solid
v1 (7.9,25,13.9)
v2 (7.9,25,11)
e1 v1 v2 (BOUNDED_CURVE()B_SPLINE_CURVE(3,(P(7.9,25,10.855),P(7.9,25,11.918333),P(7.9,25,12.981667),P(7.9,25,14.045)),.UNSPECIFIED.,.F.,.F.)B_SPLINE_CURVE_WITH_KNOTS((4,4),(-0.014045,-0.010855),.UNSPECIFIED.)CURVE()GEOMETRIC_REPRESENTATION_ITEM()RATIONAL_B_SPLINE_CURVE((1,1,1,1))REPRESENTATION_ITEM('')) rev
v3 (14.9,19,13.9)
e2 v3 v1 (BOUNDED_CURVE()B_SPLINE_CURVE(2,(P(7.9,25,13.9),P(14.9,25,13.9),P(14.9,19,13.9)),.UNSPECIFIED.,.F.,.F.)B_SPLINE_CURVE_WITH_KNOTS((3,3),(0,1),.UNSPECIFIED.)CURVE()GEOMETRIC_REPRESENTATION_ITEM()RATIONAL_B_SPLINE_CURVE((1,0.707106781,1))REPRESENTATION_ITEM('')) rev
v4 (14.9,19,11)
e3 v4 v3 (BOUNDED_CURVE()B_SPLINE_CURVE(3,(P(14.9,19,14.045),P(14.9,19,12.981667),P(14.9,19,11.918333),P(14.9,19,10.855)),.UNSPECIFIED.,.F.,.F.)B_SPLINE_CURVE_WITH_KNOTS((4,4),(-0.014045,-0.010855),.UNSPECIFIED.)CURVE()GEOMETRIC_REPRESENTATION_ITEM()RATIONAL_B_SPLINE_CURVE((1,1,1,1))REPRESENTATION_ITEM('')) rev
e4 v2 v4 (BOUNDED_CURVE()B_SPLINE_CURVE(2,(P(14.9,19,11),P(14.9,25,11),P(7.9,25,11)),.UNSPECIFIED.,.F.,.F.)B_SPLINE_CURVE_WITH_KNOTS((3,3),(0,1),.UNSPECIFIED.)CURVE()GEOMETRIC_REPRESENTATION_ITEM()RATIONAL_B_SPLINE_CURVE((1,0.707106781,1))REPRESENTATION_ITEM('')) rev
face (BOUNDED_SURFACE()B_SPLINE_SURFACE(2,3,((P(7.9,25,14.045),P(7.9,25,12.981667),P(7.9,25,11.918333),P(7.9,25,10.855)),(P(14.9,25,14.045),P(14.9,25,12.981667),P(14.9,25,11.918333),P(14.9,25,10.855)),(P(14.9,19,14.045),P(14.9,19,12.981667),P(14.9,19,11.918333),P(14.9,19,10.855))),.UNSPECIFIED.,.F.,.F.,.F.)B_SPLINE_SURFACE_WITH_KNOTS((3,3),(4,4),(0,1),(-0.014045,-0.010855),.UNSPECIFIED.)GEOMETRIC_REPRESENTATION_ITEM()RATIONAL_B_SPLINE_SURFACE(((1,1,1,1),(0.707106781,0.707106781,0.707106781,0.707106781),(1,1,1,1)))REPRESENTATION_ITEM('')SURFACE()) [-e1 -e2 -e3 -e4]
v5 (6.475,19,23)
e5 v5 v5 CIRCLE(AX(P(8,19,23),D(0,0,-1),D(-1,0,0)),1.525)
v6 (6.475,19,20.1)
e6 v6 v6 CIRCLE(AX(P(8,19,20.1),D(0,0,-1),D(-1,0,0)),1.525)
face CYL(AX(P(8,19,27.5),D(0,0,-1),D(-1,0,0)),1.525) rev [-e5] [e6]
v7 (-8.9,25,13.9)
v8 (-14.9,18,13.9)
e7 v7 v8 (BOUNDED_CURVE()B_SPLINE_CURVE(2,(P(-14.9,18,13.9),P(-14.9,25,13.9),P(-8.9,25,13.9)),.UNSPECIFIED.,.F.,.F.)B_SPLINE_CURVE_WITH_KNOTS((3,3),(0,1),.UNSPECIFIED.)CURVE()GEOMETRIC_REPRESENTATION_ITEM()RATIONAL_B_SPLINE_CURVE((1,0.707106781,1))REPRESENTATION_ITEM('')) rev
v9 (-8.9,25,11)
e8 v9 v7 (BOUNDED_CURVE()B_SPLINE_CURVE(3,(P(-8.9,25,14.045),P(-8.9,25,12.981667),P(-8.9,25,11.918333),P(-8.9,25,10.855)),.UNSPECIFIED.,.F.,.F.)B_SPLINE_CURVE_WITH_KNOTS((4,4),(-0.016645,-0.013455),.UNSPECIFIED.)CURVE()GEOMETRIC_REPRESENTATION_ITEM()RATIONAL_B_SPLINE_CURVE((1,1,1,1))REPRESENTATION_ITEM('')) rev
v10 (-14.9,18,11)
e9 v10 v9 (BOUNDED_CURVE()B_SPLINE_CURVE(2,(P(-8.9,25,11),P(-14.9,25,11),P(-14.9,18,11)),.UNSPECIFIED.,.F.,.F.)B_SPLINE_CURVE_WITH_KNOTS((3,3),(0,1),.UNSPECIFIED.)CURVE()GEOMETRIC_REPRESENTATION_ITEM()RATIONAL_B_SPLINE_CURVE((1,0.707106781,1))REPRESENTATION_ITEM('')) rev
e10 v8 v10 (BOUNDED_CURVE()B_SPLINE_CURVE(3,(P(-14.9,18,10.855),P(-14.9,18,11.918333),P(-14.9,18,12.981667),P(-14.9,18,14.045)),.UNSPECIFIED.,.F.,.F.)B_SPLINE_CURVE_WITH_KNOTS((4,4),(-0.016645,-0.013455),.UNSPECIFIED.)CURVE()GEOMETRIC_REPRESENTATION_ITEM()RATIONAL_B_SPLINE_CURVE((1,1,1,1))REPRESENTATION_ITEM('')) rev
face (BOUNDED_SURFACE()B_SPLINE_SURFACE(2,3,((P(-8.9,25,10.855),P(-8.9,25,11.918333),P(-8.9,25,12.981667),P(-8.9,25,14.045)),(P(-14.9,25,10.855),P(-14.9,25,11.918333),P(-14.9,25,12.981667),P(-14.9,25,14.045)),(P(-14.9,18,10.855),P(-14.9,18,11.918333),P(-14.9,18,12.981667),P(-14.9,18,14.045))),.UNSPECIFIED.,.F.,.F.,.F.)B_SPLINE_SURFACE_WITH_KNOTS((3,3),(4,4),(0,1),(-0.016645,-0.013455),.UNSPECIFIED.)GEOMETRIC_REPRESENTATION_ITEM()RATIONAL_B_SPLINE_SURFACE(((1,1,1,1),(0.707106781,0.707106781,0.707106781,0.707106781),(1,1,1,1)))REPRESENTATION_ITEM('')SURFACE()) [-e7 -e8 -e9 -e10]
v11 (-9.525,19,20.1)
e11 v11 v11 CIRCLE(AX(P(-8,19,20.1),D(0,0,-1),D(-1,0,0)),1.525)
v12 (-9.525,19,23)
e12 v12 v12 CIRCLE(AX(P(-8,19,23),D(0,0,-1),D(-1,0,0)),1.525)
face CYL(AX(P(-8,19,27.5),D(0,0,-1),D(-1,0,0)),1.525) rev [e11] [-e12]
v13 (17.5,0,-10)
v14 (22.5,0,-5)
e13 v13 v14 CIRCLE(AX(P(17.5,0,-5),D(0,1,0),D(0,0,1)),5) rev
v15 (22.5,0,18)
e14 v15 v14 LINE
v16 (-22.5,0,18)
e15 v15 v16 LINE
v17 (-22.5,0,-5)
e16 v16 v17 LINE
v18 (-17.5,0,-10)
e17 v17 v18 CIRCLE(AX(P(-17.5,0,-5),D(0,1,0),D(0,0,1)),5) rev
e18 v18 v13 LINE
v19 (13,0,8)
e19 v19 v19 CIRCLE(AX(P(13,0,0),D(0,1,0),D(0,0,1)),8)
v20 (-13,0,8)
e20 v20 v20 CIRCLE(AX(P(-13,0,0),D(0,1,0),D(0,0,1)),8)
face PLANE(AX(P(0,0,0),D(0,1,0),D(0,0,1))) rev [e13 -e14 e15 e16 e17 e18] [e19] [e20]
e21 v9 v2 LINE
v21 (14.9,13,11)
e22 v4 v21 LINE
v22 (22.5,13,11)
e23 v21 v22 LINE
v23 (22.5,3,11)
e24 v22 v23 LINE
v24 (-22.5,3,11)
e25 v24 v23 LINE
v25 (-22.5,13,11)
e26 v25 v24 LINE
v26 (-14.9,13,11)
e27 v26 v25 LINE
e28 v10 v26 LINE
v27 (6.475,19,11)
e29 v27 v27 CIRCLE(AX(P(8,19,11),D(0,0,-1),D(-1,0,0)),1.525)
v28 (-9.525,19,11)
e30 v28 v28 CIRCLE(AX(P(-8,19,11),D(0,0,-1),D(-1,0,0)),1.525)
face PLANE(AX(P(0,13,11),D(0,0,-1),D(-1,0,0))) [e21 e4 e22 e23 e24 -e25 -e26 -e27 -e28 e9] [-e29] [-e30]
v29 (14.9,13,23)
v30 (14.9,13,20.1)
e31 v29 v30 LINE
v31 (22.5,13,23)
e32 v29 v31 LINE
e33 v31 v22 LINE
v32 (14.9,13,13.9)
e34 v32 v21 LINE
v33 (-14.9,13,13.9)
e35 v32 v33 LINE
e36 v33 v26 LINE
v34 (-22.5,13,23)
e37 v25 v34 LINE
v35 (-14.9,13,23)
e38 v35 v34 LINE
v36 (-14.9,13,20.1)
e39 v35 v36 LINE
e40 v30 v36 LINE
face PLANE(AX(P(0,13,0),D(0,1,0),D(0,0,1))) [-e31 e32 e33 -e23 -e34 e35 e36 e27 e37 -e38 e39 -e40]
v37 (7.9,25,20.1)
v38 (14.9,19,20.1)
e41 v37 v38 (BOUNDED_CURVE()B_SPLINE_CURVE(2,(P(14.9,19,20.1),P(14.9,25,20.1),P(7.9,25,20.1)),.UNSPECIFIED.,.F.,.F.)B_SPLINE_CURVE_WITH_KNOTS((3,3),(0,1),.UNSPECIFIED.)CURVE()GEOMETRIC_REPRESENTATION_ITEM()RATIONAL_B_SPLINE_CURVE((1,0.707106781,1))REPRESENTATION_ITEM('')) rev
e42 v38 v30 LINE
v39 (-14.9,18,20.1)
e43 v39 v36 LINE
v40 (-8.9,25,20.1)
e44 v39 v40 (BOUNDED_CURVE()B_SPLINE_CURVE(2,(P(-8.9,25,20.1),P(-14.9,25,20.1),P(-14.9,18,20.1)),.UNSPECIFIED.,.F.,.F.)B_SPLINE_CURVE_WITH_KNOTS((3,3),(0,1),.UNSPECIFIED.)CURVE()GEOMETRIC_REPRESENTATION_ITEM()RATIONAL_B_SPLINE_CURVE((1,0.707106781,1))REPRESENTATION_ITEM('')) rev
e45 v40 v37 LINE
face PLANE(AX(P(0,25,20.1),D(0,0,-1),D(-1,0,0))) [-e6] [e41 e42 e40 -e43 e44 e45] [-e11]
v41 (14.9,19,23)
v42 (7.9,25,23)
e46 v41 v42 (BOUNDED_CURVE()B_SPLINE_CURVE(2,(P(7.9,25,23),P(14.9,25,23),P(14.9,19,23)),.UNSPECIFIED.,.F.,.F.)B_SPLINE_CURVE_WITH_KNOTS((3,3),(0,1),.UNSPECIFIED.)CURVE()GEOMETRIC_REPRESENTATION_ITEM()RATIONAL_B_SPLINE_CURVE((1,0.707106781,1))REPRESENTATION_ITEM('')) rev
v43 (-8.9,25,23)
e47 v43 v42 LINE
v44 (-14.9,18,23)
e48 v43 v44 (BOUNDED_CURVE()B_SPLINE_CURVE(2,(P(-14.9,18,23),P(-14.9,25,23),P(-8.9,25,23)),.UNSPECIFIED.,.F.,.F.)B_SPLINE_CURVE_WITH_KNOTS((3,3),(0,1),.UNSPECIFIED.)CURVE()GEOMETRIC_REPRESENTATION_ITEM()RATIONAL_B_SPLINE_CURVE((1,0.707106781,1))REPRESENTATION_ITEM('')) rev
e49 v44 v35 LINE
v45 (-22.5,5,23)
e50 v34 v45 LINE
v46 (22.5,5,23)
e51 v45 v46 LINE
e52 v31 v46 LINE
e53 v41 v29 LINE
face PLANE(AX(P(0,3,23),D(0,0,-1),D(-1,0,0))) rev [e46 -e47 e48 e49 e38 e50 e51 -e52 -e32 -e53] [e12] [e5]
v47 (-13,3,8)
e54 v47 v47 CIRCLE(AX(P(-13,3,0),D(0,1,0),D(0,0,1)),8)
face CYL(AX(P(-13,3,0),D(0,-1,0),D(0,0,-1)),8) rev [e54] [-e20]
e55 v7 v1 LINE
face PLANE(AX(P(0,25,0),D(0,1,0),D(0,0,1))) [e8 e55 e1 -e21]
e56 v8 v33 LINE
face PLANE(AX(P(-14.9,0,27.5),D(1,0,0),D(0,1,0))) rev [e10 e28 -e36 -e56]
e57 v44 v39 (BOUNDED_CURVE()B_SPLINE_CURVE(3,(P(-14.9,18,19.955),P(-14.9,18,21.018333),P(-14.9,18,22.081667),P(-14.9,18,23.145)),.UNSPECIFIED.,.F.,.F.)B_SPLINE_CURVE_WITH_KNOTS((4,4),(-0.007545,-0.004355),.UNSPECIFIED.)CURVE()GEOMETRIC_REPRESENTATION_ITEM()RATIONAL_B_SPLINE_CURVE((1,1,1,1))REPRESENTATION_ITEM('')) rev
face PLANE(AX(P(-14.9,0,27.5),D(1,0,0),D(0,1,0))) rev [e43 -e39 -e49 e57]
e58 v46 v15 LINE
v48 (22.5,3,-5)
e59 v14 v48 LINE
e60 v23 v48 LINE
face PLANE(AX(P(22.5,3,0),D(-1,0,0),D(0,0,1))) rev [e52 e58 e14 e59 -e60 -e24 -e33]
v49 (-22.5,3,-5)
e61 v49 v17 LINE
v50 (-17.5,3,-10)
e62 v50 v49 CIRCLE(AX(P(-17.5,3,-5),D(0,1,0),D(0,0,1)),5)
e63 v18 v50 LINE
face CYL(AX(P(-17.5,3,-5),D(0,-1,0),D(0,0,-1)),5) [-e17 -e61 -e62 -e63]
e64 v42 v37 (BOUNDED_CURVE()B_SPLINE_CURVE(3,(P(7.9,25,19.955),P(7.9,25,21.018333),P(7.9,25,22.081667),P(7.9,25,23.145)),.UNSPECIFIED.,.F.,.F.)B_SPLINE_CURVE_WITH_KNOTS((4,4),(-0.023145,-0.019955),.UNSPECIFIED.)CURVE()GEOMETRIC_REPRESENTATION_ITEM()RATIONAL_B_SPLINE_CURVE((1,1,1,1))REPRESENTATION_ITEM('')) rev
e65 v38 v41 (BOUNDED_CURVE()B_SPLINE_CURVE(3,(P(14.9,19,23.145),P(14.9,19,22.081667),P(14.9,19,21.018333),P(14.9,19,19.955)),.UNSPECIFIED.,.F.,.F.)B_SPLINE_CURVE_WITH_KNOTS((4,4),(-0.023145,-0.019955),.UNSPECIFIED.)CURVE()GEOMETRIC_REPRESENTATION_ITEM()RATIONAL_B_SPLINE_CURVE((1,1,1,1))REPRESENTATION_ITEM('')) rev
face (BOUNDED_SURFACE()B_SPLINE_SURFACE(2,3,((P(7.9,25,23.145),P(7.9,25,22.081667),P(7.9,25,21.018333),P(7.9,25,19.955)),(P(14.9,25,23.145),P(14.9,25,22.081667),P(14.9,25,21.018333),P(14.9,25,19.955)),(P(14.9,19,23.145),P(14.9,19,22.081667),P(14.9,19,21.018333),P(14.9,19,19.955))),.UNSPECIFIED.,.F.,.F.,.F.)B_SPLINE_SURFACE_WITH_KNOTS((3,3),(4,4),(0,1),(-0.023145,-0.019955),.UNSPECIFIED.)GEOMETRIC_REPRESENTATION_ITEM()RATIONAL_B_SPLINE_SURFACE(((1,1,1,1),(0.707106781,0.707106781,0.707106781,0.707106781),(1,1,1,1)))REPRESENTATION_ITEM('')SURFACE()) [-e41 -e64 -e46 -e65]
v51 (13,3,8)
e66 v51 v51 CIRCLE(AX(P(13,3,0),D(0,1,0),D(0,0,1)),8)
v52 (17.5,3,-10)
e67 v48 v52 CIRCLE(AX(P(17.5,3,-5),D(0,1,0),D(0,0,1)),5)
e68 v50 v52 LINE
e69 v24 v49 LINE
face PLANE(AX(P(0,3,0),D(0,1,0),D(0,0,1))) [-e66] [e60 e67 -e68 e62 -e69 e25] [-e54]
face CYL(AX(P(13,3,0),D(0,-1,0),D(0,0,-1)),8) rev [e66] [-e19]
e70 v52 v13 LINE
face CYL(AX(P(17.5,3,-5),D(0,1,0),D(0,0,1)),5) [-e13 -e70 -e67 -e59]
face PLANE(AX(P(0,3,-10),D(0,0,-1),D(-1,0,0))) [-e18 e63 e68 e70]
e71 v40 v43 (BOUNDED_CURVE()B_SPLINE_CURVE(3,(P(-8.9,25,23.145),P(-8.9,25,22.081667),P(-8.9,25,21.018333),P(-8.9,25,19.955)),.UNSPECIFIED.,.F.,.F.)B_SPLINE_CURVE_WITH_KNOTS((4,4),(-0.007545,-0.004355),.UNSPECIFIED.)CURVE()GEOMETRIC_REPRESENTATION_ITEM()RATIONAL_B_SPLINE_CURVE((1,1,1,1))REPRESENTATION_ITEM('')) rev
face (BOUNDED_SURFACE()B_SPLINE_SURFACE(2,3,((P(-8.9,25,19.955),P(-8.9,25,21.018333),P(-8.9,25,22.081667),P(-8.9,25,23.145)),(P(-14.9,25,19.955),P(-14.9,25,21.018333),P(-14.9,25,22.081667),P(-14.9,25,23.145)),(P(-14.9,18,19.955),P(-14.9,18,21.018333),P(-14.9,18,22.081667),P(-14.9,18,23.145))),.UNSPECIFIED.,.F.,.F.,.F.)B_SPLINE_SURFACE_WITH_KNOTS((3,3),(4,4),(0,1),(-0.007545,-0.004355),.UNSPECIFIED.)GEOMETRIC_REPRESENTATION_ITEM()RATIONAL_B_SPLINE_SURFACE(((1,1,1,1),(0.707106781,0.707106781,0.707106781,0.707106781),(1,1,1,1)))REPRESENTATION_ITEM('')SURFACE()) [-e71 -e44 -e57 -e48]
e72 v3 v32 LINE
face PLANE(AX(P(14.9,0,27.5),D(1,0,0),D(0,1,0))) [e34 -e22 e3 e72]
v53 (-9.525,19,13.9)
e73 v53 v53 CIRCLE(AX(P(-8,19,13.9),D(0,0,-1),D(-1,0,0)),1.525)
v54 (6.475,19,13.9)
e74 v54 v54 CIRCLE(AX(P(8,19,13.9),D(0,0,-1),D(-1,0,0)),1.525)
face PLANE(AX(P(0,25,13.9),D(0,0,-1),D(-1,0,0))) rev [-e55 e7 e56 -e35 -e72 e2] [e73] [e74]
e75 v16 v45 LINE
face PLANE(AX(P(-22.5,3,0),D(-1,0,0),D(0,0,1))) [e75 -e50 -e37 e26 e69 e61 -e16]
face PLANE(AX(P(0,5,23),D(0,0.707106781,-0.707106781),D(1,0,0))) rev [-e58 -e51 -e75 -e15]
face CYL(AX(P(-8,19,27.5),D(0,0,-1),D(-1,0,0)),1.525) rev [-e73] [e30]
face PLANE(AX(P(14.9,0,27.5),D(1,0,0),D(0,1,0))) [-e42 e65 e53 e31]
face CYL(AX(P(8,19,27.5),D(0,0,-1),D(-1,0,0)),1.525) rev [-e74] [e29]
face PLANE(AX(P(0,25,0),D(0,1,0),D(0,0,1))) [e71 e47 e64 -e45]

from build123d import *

# Parameters (mm, degrees)
SKETCH1_W           = 45
SKETCH1_H           = 20
SKETCH1_R           = 8
SKETCH1_H_2         = 13
SKETCH1_H_3         = 1
BOSS_EXTRUDE1_DEPTH = 3
SKETCH3_W           = 45
SKETCH3_H           = 2.9
SKETCH3_H_2         = 6.2
BOSS_EXTRUDE2_DEPTH = 10
SKETCH3_3_W         = 45
SKETCH3_3_H         = 2.9
BOSS_EXTRUDE3_DEPTH = 22
SKETCH6_R           = 1.525
SKETCH6_W           = 7.6
SKETCH6_H           = 12
CUT_EXTRUDE2_DEPTH  = 16.5
CHAMFER1_SIZE       = 5
FILLET2_R           = 5
FILLET3_SIZE        = 7
FILLET3_SIZE_2      = 6


with BuildPart() as part:
    # Sketch1 → Boss-Extrude1 (new body)
    # profile 1 of 3: a face of its own
    with BuildSketch(Plane(origin=(0, 0, 0), x_dir=(1, 0, 0), z_dir=(0, 1, 0))):
        Rectangle(SKETCH1_W, SKETCH1_H)
        with Locations(Location((13, 0, 0), (0, 0, 270))):
            Circle(SKETCH1_R, mode=Mode.SUBTRACT)
        with Locations(Location((-13, 0, 0), (0, 0, 270))):
            Circle(SKETCH1_R, mode=Mode.SUBTRACT)
    # profile 2 of 3: a face of its own
    with BuildSketch(Plane(origin=(0, 0, 0), x_dir=(1, 0, 0), z_dir=(0, 1, 0))):
        with Locations((0, -16.5)):
            Rectangle(SKETCH1_W, SKETCH1_H_2)
    # profile 3 of 3: a face of its own
    with BuildSketch(Plane(origin=(0, 0, 0), x_dir=(1, 0, 0), z_dir=(0, 1, 0))):
        with Locations((0, -10.5)):
            Rectangle(SKETCH1_W, SKETCH1_H_3)
    extrude(amount=BOSS_EXTRUDE1_DEPTH)

    # Sketch3 → Boss-Extrude2 (add)
    with BuildSketch(Plane(origin=(0, 3, 0), x_dir=(1, 0, 0), z_dir=(0, 1, 0))):
        with Locations((0, -21.55)):
            Rectangle(SKETCH3_W, SKETCH3_H)
        with Locations((0, -17)):
            Rectangle(SKETCH3_W, SKETCH3_H_2)
        with Locations((0, -12.45)):
            Rectangle(SKETCH3_W, SKETCH3_H)
    extrude(amount=BOSS_EXTRUDE2_DEPTH)

    # Sketch3<3> → Boss-Extrude3 (add)
    with BuildSketch(Plane(origin=(0, 3, 0), x_dir=(1, 0, 0), z_dir=(0, 1, 0))):
        with Locations((0, -12.45)):
            Rectangle(SKETCH3_3_W, SKETCH3_3_H)
        with Locations((0, -21.55)):
            Rectangle(SKETCH3_3_W, SKETCH3_3_H)
    extrude(amount=BOSS_EXTRUDE3_DEPTH)

    # Sketch6 → Cut-Extrude2 (cut)
    with BuildSketch(Plane(origin=(0, 0, 11), x_dir=(-1, 0, 0), z_dir=(0, 0, -1))):
        with Locations((-8, 19)):
            Circle(SKETCH6_R)
        with Locations((8, 19)):
            Circle(SKETCH6_R)
        with Locations((-18.7, 19)):
            Rectangle(SKETCH6_W, SKETCH6_H)
        with Locations((18.7, 19)):
            Rectangle(SKETCH6_W, SKETCH6_H)
    extrude(amount=-CUT_EXTRUDE2_DEPTH, mode=Mode.SUBTRACT)

    # Chamfer1
    chamfer1_edges = [part.edges().sort_by_distance(p)[0] for p in [
        (0, 0, 23),
    ]]
    chamfer(chamfer1_edges, length=CHAMFER1_SIZE)

    # Fillet2
    fillet2_edges = [part.edges().sort_by_distance(p)[0] for p in [
        (-22.5, 1.5, -10),
        (22.5, 1.5, -10),
    ]]
    fillet(fillet2_edges, radius=FILLET2_R)

    # Fillet3
    # an asymmetric fillet: 7, 6 mm, written as the material it takes off along each edge
    with BuildSketch(Plane(origin=(14.9, 25, -6.5), x_dir=(-1, 0, 0), z_dir=(0, 0, 1)), Plane(origin=(-14.9, 25, -6.5), x_dir=(0, -1, 0), z_dir=(0, 0, 1))) as fillet3_piece_1:
        with BuildLine():
            Bezier((FILLET3_SIZE, 0), (0, 0), (0, FILLET3_SIZE_2), weights=[1, 0.707106781, 1])
            Line((0, FILLET3_SIZE_2), (0, 0))
            Line((0, 0), (FILLET3_SIZE, 0))
        make_face()
    extrude(amount=37.9, mode=Mode.SUBTRACT)
    with BuildSketch(Plane(origin=(14.9, 25, 2.6), x_dir=(0, -1, 0), z_dir=(0, 0, 1)), Plane(origin=(-14.9, 25, 2.6), x_dir=(1, 0, 0), z_dir=(0, 0, 1))) as fillet3_piece_2:
        with BuildLine():
            Bezier((FILLET3_SIZE_2, 0), (0, 0), (0, -FILLET3_SIZE), weights=[1, 0.707106781, 1])
            Line((0, -FILLET3_SIZE), (0, 0))
            Line((0, 0), (FILLET3_SIZE_2, 0))
        make_face()
    extrude(amount=37.9, mode=Mode.SUBTRACT)


solid = part.part
